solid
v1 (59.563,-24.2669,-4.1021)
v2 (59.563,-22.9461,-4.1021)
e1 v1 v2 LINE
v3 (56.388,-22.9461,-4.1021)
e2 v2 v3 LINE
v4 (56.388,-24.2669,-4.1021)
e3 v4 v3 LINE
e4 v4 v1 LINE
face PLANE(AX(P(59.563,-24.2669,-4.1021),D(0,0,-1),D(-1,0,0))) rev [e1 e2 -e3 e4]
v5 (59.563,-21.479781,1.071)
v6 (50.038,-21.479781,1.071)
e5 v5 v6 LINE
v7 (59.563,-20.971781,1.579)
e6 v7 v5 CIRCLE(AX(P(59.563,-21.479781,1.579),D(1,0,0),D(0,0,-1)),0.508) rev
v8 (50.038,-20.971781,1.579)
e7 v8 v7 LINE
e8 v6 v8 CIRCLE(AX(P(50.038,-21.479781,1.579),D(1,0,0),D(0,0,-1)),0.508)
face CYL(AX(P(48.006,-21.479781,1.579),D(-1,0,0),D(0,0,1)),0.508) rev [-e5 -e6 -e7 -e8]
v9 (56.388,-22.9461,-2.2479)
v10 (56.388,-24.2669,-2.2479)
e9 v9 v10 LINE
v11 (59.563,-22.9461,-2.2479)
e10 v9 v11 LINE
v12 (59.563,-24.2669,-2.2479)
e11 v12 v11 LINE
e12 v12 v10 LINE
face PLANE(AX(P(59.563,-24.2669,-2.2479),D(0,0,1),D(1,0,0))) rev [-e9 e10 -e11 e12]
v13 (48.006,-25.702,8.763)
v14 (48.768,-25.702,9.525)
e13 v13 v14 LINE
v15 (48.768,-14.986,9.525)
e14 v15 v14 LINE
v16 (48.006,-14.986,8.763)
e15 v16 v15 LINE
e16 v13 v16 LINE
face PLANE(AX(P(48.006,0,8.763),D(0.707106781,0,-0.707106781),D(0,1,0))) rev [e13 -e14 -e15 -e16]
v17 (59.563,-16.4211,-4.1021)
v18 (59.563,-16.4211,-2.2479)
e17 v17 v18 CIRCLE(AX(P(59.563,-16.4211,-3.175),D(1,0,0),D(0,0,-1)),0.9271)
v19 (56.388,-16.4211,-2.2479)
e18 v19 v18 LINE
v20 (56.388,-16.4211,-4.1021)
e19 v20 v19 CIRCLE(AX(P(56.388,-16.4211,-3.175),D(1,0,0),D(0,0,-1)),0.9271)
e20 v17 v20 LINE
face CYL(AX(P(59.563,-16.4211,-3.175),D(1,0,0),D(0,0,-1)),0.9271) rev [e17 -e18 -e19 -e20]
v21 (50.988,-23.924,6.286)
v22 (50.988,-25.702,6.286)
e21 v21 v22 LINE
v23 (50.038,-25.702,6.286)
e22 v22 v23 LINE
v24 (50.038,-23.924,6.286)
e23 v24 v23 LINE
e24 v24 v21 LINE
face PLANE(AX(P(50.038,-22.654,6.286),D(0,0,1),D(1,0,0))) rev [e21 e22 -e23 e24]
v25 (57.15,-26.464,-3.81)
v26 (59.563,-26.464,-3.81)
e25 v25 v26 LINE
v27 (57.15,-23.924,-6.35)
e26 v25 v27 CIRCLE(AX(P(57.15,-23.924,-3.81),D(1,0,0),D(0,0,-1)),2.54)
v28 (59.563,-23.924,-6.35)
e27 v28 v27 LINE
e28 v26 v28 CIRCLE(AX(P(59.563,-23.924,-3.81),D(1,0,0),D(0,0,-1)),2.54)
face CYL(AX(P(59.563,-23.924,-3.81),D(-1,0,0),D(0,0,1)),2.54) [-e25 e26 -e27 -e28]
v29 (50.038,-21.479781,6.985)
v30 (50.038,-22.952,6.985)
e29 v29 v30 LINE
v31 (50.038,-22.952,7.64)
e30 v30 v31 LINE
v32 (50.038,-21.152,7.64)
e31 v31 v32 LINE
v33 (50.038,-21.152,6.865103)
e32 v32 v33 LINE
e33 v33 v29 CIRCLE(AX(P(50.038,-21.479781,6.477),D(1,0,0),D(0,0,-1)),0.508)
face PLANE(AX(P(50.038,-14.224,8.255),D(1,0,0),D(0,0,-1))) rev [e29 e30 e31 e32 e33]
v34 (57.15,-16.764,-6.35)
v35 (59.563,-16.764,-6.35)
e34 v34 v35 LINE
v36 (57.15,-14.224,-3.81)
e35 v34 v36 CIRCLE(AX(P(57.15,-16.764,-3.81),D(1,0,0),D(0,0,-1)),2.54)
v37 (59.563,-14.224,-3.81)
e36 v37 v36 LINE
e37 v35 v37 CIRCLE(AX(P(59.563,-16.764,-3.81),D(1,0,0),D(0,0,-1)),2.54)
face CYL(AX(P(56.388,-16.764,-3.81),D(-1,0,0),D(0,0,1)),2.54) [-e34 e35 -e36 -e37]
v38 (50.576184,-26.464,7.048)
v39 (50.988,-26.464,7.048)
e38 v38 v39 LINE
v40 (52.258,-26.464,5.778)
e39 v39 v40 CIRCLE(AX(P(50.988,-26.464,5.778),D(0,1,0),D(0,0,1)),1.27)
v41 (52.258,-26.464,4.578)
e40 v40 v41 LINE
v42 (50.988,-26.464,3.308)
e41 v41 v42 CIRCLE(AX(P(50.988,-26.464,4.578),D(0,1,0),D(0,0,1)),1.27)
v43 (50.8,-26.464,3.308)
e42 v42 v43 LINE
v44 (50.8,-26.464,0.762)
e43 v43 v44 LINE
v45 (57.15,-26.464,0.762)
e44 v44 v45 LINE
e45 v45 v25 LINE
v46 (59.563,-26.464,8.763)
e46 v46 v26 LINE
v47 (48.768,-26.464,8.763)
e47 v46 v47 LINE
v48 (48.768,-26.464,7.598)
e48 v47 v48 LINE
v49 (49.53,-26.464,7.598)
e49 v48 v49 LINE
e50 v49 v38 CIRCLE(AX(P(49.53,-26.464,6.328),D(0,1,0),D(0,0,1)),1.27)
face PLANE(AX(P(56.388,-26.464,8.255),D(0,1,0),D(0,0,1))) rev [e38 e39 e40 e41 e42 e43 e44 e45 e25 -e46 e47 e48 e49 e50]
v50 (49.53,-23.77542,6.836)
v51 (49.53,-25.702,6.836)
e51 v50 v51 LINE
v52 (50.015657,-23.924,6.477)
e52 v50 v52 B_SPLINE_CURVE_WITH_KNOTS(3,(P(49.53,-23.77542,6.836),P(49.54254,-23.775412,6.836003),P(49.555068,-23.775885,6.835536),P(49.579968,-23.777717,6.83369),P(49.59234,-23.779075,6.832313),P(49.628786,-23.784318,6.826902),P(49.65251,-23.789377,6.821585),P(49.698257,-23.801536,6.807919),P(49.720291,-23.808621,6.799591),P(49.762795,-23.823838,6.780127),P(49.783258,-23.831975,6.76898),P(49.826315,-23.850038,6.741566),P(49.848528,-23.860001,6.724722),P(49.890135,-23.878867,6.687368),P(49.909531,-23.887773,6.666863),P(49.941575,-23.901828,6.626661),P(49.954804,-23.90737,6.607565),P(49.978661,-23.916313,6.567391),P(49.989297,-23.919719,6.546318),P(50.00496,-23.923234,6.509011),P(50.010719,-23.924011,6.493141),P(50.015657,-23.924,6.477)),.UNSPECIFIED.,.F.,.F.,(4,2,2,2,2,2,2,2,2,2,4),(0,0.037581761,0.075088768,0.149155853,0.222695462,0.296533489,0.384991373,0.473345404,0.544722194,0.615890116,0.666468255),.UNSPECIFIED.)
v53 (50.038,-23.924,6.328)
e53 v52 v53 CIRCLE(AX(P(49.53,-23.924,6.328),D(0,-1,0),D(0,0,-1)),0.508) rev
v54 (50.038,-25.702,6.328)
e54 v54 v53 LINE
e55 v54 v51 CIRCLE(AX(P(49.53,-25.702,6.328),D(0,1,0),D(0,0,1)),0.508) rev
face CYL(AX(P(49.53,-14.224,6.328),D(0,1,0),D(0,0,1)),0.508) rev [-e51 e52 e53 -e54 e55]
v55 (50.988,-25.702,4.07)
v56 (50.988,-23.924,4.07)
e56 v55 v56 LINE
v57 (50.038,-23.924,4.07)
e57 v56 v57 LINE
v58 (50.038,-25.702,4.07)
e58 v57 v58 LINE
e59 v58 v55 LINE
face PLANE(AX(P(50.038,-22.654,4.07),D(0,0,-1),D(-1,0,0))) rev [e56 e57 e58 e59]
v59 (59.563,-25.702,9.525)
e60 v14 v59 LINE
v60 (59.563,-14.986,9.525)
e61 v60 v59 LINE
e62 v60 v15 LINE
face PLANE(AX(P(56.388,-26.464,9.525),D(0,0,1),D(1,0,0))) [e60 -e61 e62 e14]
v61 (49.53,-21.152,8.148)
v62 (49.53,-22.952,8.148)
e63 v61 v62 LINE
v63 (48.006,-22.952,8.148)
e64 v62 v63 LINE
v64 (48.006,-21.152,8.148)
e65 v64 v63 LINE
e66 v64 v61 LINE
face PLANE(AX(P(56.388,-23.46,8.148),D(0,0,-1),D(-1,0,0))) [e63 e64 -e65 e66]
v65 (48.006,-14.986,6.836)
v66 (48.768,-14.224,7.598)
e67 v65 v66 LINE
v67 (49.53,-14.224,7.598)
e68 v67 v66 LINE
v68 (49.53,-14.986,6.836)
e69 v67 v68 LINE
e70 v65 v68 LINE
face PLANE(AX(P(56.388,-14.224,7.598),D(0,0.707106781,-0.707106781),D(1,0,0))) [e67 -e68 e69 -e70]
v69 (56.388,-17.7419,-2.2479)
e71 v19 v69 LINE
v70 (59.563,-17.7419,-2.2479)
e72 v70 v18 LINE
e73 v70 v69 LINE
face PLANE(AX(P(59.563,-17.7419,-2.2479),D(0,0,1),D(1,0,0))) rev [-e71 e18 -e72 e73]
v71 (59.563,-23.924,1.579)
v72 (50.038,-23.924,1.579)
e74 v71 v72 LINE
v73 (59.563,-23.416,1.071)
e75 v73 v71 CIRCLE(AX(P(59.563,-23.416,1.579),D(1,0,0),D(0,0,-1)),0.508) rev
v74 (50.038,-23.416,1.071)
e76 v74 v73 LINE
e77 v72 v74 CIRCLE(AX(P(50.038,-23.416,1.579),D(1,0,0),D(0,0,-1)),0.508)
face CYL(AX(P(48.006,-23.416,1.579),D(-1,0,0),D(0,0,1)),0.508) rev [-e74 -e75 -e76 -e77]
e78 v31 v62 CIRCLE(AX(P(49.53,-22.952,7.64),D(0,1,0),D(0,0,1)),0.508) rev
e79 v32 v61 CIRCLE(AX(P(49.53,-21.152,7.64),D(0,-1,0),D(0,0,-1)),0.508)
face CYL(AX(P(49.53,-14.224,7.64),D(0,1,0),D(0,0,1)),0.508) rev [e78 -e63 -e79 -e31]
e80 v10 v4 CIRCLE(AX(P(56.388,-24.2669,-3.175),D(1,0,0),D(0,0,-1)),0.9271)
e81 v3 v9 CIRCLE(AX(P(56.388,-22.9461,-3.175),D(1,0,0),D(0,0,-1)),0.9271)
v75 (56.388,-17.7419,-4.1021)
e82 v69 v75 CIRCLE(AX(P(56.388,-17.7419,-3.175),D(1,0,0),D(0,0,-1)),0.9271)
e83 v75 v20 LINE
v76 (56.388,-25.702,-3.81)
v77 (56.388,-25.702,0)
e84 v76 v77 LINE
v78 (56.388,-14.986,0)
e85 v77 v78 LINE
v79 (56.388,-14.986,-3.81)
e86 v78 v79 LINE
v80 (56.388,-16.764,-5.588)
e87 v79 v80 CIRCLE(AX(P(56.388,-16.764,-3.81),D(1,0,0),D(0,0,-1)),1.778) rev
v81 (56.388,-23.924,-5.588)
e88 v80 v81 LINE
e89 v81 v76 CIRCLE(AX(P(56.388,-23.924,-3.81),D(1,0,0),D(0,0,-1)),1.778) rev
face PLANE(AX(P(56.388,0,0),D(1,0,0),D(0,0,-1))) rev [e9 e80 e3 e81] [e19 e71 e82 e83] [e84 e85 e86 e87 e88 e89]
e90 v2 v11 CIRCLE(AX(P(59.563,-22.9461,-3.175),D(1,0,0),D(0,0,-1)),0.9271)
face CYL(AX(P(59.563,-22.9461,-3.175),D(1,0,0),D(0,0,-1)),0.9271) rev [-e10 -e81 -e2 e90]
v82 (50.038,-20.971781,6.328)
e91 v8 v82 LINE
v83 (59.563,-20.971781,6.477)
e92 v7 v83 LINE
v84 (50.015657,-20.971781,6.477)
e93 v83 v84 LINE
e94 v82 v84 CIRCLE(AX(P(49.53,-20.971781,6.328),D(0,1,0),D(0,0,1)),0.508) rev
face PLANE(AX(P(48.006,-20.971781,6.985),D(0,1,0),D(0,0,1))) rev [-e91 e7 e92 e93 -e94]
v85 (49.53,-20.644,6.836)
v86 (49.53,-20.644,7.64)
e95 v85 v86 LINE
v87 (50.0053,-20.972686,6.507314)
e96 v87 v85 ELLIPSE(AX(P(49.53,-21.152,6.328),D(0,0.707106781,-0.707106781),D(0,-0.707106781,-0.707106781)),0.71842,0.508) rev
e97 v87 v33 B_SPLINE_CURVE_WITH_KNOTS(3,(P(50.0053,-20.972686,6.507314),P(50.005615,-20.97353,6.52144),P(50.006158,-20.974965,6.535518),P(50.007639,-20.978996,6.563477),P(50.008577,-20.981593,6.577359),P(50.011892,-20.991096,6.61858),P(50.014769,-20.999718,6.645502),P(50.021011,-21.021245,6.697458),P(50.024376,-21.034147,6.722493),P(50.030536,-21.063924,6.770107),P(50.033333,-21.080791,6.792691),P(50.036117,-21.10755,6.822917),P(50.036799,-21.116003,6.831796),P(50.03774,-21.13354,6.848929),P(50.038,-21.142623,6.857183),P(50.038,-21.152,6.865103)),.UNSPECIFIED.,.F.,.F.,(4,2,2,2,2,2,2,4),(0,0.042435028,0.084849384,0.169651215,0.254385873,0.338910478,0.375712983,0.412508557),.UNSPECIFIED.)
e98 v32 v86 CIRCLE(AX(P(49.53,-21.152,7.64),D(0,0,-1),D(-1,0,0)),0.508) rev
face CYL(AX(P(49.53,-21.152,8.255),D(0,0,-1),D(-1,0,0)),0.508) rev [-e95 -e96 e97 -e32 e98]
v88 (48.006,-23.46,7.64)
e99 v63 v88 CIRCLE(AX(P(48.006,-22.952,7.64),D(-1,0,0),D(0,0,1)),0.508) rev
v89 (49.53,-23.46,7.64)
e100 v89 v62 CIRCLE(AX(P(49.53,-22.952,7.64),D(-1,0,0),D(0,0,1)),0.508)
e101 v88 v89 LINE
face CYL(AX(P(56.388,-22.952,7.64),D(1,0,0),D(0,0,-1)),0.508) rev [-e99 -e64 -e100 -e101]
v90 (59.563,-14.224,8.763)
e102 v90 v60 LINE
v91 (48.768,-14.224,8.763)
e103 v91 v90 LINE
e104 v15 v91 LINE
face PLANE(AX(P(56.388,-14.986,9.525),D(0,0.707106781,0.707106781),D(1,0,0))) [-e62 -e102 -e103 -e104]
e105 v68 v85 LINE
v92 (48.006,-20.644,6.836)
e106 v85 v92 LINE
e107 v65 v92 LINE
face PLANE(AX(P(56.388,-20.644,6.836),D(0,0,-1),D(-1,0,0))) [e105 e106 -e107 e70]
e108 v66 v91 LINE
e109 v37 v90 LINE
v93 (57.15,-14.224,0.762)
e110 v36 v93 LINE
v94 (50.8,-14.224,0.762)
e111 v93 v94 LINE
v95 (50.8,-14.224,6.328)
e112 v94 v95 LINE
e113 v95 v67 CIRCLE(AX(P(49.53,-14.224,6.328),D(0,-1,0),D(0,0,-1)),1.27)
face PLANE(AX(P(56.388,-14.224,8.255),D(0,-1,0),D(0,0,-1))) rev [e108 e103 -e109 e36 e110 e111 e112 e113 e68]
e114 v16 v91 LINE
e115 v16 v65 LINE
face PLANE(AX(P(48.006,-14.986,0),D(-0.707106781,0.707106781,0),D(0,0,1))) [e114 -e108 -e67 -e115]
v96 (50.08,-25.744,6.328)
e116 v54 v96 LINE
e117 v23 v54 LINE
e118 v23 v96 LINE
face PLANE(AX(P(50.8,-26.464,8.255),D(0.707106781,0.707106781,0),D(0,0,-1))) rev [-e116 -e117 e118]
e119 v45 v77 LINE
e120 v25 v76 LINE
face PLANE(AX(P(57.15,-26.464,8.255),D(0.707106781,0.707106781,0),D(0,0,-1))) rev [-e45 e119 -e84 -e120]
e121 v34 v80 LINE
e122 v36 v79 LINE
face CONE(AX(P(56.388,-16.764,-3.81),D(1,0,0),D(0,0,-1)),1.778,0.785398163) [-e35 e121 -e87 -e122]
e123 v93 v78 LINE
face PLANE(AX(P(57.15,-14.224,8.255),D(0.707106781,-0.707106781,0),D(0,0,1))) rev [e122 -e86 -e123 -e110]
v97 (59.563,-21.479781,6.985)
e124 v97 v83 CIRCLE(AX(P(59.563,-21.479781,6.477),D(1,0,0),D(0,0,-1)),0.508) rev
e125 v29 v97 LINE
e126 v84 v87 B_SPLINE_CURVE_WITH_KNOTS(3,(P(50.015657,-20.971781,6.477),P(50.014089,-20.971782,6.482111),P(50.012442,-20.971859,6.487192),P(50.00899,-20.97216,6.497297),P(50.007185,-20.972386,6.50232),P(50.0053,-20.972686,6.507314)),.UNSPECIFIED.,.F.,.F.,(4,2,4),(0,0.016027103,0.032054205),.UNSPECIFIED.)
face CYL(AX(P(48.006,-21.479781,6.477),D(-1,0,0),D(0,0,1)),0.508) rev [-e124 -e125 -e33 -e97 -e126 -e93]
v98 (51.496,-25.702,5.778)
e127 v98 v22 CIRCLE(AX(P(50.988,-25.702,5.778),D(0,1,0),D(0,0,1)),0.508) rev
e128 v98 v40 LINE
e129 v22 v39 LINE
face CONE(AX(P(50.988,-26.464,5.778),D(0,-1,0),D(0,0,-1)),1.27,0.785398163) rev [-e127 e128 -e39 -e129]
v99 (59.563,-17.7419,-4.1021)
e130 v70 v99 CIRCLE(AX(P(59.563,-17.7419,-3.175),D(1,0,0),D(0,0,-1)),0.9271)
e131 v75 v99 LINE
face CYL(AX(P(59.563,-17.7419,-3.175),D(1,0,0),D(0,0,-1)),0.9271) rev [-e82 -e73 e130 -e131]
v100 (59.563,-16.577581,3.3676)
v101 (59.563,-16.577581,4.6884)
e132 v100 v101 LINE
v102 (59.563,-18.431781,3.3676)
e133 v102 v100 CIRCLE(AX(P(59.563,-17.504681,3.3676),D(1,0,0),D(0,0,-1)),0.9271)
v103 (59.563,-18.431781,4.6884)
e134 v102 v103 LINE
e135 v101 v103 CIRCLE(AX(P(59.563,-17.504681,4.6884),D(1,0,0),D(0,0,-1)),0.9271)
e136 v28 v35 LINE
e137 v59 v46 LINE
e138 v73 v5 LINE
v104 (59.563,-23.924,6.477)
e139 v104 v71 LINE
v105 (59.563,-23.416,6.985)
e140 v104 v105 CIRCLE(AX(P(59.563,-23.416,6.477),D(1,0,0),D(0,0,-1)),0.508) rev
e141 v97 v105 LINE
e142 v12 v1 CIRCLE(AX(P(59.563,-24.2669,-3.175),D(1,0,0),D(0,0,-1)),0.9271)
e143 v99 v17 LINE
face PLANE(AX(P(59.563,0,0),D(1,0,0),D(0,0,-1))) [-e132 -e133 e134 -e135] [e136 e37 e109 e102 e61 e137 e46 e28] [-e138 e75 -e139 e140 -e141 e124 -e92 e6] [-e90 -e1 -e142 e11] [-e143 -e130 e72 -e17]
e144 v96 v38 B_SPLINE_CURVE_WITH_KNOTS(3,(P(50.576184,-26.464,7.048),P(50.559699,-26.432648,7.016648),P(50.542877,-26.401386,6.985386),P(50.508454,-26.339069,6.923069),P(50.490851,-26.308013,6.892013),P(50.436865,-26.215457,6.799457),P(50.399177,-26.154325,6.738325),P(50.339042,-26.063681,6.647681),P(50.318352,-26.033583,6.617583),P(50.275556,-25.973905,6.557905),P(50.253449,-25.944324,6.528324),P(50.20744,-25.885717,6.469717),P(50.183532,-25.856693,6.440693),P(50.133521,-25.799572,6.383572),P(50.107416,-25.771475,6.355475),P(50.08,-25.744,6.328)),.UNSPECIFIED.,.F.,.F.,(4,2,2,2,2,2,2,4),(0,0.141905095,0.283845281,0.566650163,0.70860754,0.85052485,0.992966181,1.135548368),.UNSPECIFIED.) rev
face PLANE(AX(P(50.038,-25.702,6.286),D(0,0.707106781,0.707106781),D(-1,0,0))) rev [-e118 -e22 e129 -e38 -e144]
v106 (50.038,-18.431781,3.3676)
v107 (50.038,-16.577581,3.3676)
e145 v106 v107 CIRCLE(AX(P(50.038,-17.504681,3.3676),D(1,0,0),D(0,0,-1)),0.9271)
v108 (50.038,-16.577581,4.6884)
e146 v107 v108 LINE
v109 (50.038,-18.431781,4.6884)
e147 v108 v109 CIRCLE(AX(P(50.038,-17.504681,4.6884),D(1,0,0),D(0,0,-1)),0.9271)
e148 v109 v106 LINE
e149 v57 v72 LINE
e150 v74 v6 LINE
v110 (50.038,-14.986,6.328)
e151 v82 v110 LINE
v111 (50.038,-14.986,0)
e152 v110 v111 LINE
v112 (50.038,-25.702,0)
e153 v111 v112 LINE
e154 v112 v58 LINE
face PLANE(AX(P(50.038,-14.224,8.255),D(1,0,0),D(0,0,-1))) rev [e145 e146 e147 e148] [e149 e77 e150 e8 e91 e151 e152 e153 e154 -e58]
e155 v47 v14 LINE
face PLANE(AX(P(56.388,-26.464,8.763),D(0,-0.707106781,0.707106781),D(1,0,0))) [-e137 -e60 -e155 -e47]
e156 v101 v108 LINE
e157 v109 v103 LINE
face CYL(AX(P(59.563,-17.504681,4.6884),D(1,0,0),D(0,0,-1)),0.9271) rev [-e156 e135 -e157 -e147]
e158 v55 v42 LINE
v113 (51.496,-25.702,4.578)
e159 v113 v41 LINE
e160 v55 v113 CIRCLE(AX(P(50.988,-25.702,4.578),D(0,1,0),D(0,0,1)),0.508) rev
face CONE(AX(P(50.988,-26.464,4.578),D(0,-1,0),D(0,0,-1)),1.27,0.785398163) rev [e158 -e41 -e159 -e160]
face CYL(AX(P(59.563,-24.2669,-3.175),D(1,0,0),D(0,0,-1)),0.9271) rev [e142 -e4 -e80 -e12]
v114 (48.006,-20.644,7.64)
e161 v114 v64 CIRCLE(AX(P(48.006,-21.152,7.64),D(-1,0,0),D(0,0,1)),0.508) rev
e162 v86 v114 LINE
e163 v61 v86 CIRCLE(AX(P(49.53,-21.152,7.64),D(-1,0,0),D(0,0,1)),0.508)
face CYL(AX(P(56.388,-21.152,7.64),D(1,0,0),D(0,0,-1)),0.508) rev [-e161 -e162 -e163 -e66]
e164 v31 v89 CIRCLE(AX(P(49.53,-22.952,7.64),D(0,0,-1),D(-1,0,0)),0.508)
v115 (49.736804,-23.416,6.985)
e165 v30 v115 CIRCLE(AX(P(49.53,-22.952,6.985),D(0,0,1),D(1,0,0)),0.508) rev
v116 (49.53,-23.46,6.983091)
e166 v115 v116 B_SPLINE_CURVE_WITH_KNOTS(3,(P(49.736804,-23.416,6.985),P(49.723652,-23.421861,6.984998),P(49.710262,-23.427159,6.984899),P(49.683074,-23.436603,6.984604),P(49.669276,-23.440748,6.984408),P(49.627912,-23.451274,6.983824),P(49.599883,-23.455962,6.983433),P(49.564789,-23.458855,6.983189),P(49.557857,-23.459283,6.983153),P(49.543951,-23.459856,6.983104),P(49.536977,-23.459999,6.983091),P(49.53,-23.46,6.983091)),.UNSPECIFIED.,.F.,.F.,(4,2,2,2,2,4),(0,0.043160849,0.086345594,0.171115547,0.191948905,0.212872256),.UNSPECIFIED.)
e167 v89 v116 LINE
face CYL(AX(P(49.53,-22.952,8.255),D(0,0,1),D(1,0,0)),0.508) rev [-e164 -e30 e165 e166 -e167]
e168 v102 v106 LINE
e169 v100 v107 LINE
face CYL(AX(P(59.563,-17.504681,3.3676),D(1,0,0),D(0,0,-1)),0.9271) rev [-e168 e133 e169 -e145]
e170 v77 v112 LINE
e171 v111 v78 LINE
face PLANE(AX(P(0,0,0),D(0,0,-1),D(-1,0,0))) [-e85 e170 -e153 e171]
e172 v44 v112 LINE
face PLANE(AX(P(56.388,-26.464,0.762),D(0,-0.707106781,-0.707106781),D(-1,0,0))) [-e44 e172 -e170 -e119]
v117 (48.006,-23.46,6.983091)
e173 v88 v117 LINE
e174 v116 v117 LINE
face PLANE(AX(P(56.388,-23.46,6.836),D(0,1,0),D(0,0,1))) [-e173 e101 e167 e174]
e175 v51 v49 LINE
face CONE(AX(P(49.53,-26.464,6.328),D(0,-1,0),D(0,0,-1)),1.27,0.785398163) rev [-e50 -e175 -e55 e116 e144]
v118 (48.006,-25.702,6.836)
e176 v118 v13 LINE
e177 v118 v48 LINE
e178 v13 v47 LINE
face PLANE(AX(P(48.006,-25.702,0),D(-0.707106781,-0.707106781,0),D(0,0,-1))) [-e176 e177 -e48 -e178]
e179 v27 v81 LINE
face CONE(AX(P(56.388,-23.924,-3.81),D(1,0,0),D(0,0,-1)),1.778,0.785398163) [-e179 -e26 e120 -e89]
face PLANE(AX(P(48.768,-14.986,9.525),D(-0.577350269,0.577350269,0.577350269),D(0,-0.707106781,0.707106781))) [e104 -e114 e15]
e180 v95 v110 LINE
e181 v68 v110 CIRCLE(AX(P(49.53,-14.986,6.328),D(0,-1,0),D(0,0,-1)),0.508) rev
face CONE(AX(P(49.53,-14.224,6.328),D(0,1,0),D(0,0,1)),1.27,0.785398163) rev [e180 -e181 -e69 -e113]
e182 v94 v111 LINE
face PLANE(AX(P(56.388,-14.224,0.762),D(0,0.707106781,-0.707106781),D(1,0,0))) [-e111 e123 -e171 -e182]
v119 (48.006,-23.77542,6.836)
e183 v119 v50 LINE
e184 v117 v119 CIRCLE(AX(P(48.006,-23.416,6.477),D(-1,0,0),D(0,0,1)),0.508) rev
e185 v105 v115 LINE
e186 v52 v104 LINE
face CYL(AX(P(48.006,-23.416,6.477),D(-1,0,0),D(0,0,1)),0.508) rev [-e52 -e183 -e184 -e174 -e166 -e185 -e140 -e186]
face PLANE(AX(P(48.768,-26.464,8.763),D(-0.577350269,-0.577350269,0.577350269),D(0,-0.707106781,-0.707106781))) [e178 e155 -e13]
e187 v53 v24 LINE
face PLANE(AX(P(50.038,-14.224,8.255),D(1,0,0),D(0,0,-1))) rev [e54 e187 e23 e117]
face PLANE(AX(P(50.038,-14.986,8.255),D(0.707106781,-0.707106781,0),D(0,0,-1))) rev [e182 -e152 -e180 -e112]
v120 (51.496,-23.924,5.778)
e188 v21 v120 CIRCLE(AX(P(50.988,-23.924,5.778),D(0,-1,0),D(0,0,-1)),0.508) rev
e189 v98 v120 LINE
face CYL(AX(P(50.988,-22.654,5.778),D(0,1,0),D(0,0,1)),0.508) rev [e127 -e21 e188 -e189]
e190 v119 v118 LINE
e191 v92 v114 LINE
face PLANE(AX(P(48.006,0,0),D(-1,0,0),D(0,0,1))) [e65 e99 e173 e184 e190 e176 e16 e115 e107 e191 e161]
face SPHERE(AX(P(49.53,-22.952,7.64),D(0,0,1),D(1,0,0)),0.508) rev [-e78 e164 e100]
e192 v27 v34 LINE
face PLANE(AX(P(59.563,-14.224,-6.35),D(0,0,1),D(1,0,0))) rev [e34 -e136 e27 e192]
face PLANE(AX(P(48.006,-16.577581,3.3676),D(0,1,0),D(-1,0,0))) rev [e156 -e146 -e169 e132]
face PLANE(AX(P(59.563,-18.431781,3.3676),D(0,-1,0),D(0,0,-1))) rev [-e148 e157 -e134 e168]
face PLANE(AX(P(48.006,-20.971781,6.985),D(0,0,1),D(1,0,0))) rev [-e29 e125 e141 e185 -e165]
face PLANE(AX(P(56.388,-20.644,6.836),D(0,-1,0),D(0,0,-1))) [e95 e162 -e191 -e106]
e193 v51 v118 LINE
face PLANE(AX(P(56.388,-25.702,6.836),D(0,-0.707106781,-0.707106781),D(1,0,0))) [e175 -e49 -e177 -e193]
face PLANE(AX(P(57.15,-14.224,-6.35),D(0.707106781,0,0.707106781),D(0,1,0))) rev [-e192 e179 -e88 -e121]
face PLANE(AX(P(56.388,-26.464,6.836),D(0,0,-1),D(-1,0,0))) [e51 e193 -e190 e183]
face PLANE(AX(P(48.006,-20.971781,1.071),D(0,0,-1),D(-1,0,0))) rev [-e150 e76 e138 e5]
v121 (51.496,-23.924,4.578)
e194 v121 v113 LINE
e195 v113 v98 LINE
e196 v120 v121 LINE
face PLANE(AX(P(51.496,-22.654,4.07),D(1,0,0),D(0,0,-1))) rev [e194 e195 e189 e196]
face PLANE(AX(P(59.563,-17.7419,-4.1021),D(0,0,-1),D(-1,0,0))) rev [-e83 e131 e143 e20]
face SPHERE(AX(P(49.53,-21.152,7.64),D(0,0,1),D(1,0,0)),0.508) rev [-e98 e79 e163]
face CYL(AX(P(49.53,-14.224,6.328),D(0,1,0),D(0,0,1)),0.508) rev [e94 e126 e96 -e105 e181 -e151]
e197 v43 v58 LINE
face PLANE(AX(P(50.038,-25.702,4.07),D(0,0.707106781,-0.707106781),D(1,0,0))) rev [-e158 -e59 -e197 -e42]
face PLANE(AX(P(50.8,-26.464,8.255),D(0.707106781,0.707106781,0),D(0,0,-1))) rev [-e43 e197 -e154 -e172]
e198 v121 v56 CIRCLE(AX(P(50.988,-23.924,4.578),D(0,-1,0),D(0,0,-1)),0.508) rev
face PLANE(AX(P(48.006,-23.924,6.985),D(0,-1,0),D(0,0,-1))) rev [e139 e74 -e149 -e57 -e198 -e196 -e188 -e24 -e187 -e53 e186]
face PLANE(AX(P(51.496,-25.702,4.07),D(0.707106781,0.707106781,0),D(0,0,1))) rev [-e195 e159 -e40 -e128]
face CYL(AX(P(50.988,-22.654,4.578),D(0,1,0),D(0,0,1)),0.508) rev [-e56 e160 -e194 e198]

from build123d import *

# Parameters (mm, degrees)
SKETCH1_W                 = 6.35
SKETCH1_H                 = 12.24
BOSS_EXTRUDE1_DEPTH       = 8.255
BOSS_EXTRUDE2_DEPTH       = 2.032
BOSS_EXTRUDE2_DEPTH_BACK  = 6.35
SKETCH3_W                 = 1.458
SKETCH3_H                 = 2.216
CUT_EXTRUDE1_DEPTH        = 3.81
SKETCH9_W                 = 15.875
SKETCH9_H                 = 12.24
BOSS_EXTRUDE3_DEPTH       = 3.175
FILLET2_R                 = 2.54
F_0_START                 = 50.038
F_0_CLEARANCE_SLOT1_DEPTH = 9.525
F_0_START_2               = 56.388
F_0_CLEARANCE_SLOT2_DEPTH = 3.175
FILLET3_R                 = 0.508
SKETCH12_W                = 5.914
SKETCH12_H                = 2.952219173
CUT_EXTRUDE2_DEPTH        = 31.407781492
FILLET4_R                 = 0.508


# Read off the part's stored shape, not the designer's step: #0 Clearance Slot1, #0 Clearance Slot2
with BuildPart() as part:
    # Sketch1 → Boss-Extrude1 (new body)
    with BuildSketch(Plane.XY):
        with Locations((53.213, -20.344)):
            Rectangle(SKETCH1_W, SKETCH1_H)
    extrude(amount=BOSS_EXTRUDE1_DEPTH)

    # Sketch2 → Boss-Extrude2 (add, two sides: drawn at the far end of the back side and taken through both)
    with BuildSketch(Plane.ZY.offset(-50.038).offset(-BOSS_EXTRUDE2_DEPTH_BACK)):
        Polygon((9.525, -26.464), (6.836, -26.464), (6.836, -23.46), (8.148, -23.46), (8.148, -20.644), (6.836, -20.644), (6.836, -14.224), (9.525, -14.224), align=None)
    extrude(amount=BOSS_EXTRUDE2_DEPTH + BOSS_EXTRUDE2_DEPTH_BACK)

    # Sketch3 → Cut-Extrude1 (cut)
    with BuildSketch(Plane.XZ.offset(26.464)):
        with Locations((50.767, 5.178)):
            Rectangle(SKETCH3_W, SKETCH3_H)
    extrude(amount=-CUT_EXTRUDE1_DEPTH, mode=Mode.SUBTRACT)

    # Sketch9 → Boss-Extrude3 (add)
    with BuildSketch(Plane(origin=(56.388, 0, 0), x_dir=(0, 0, -1), z_dir=(1, 0, 0))):
        with Locations((-1.5875, -20.344)):
            Rectangle(SKETCH9_W, SKETCH9_H)
    extrude(amount=BOSS_EXTRUDE3_DEPTH)

    # Fillet2
    fillet2_edges = [part.edges().sort_by_distance(p)[0] for p in [
        (57.9755, -14.224, -6.35),
        (57.9755, -26.464, -6.35),
    ]]
    fillet(fillet2_edges, radius=FILLET2_R)

    # #0 Clearance Slot1 outline → #0 Clearance Slot1 (cut)
    with BuildSketch(Plane.YZ.offset(F_0_START)):
        with BuildLine():
            Line((-18.431780827, 4.6884), (-18.431780827, 3.3676))
            ThreePointArc((-18.431780827, 3.3676), (-17.504680827, 2.4405), (-16.577580827, 3.3676))
            Line((-16.577580827, 3.3676), (-16.577580827, 4.6884))
            ThreePointArc((-16.577580827, 4.6884), (-17.504680827, 5.6155), (-18.431780827, 4.6884))
        make_face()
    extrude(amount=F_0_CLEARANCE_SLOT1_DEPTH, mode=Mode.SUBTRACT)

    # #0 Clearance Slot2 outline → #0 Clearance Slot2 (cut)
    with BuildSketch(Plane.YZ.offset(F_0_START_2)):
        with BuildLine():
            Line((-22.9461, -2.2479), (-24.2669, -2.2479))
            ThreePointArc((-24.2669, -2.2479), (-25.194, -3.175), (-24.2669, -4.1021))
            Line((-24.2669, -4.1021), (-22.9461, -4.1021))
            ThreePointArc((-22.9461, -4.1021), (-22.019, -3.175), (-22.9461, -2.2479))
        make_face()
        with BuildLine():
            ThreePointArc((-16.4211, -4.1021), (-15.494, -3.175), (-16.4211, -2.2479))
            Line((-16.4211, -2.2479), (-17.7419, -2.2479))
            ThreePointArc((-17.7419, -2.2479), (-18.669, -3.175), (-17.7419, -4.1021))
            Line((-17.7419, -4.1021), (-16.4211, -4.1021))
        make_face()
    extrude(amount=F_0_CLEARANCE_SLOT2_DEPTH, mode=Mode.SUBTRACT)

    # Fillet3
    fillet3_edges = [part.edges().sort_by_distance(p)[0] for p in [
        (50.038, -17.434, 6.836),
        (50.038, -20.644, 7.492),
        (50.038, -22.052, 8.148),
        (50.038, -23.46, 7.492),
        (49.022, -23.46, 8.148),
        (49.022, -20.644, 8.148),
        (50.038, -24.962, 6.836),
        (50.767, -22.654, 6.286),
        (51.496, -22.654, 5.178),
        (51.496, -24.559, 6.286),
        (50.767, -22.654, 4.07),
        (51.496, -24.559, 4.07),
    ]]
    fillet(fillet3_edges, radius=FILLET3_R)

    # Chamfer3
    # the kernel refuses this chamfer: 0.762 mm, written as the material it takes off along each edge
    with BuildSketch(Plane(origin=(48.514, -25.956, 9.017), x_dir=(0, -0.7071067811865475, -0.7071067811865475), z_dir=(-0.5773502691896257, -0.5773502691896257, 0.5773502691896257)), Plane(origin=(48.514, -14.732, 9.017), x_dir=(0, -0.7071067811865475, 0.7071067811865475), z_dir=(-0.5773502691896257, 0.5773502691896257, 0.5773502691896257))) as chamfer3_piece_1:
        Polygon((-0.538815367, 0.311085197), (0.538815367, 0.311085197), (0, -0.622170395), align=None)
    extrude(amount=0.967869991, mode=Mode.SUBTRACT)
    with BuildSketch(Plane(origin=(49.53, -14.224, 6.836), x_dir=(0, 0.027495876610587274, 0.9996219169112966), z_dir=(-1, 0, 0)), Plane(origin=(46.046377563, -26.464, 6.836), x_dir=(0, -0.027495876610587274, 0.9996219169112966), z_dir=(1, 0, 0))) as chamfer3_piece_2:
        with BuildLine():
            Line((0.783848975, 0), (-0.043088932, -0.782663759))
            Line((-0.043088932, -0.782663759), (-0.05832317, -0.782244722))
            ThreePointArc((-0.05832317, -0.782244722), (-0.026006471, -0.391209146), (-0.015234238, 0.000419037))
            Line((-0.015234238, 0.000419037), (0.000419037, 0.015234238))
            ThreePointArc((0.000419037, 0.015234238), (0.392047221, 0.004462005), (0.784268012, 0.015234238))
            Line((0.784268012, 0.015234238), (0.783848975, 0))
        make_face()
    extrude(amount=3.483622437, mode=Mode.SUBTRACT)
    with BuildSketch(Plane(origin=(49.53, -14.224, 6.328), x_dir=(1, 0, 0), z_dir=(0, 0, -1))) as chamfer3_piece_3:
        with BuildLine():
            Line((1.291552615, -0.021552615), (0.486447385, 0.783552615))
            Line((0.486447385, 0.783552615), (0.471207385, 0.783552615))
            ThreePointArc((0.471207385, 0.783552615), (0.49276, 0.391776307), (0.49276, 0))
            Line((0.49276, 0), (0.508, -0.01524))
            ThreePointArc((0.508, -0.01524), (0.899776307, -0.01524), (1.291552615, -0.036792615))
            Line((1.291552615, -0.036792615), (1.291552615, -0.021552615))
        make_face()
    revolve(axis=Axis((49.53, -14.224, 6.328), (0, -1, 0)), revolution_arc=90, mode=Mode.SUBTRACT)
    with BuildSketch(Plane(origin=(50.038, -14.224, -1.959622437), x_dir=(0.9996219169112966, 0.027495876610587368, 0), z_dir=(0, 0, 1))) as chamfer3_piece_4:
        with BuildLine():
            Line((0.783848975, 0), (-0.043088932, -0.782663759))
            Line((-0.043088932, -0.782663759), (-0.05832317, -0.782244722))
            ThreePointArc((-0.05832317, -0.782244722), (-0.026006471, -0.391209146), (-0.015234238, 0.000419037))
            Line((-0.015234238, 0.000419037), (0.000419037, 0.015234238))
            ThreePointArc((0.000419037, 0.015234238), (0.392047221, 0.004462005), (0.784268012, 0.015234238))
            Line((0.784268012, 0.015234238), (0.783848975, 0))
        make_face()
    extrude(amount=8.287622437, mode=Mode.SUBTRACT)
    with BuildSketch(Plane(origin=(56.388, -14.224, 0), x_dir=(0, 0.02749587661058728, 0.9996219169112966), z_dir=(-1, 0, 0))) as chamfer3_piece_5:
        with BuildLine():
            Line((0.783848975, 0), (-0.043088932, -0.782663759))
            Line((-0.043088932, -0.782663759), (-0.05832317, -0.782244722))
            ThreePointArc((-0.05832317, -0.782244722), (-0.026006471, -0.391209146), (-0.015234238, 0.000419037))
            Line((-0.015234238, 0.000419037), (0.000419037, 0.015234238))
            ThreePointArc((0.000419037, 0.015234238), (0.392047221, 0.004462005), (0.784268012, 0.015234238))
            Line((0.784268012, 0.015234238), (0.783848975, 0))
        make_face()
    extrude(amount=8.309622437, mode=Mode.SUBTRACT)
    with BuildSketch(Plane(origin=(49.53, -26.464, 6.328), x_dir=(1, 0, 0), z_dir=(0, 0, -1))) as chamfer3_piece_6:
        with BuildLine():
            Line((1.291552615, 0.021552615), (0.486447385, -0.783552615))
            Line((0.486447385, -0.783552615), (0.471207385, -0.783552615))
            ThreePointArc((0.471207385, -0.783552615), (0.49276, -0.391776307), (0.49276, 0))
            Line((0.49276, 0), (0.508, 0.01524))
            ThreePointArc((0.508, 0.01524), (0.899776307, 0.01524), (1.291552615, 0.036792615))
            Line((1.291552615, 0.036792615), (1.291552615, 0.021552615))
        make_face()
    revolve(axis=Axis((49.53, -26.464, 6.328), (0, -1, 0)), revolution_arc=90, mode=Mode.SUBTRACT)
    with BuildSketch(Plane(origin=(46.046377563, -26.464, 9.525), x_dir=(0, 0.9996219169112968, 0.027495876610587246), z_dir=(1, 0, 0)), Plane(origin=(46.046377563, -14.224, 9.525), x_dir=(0, 0.027495876610587246, -0.9996219169112968), z_dir=(1, 0, 0))) as chamfer3_piece_7:
        with BuildLine():
            Line((0.783848975, 0), (-0.043088932, -0.782663759))
            Line((-0.043088932, -0.782663759), (-0.05832317, -0.782244722))
            ThreePointArc((-0.05832317, -0.782244722), (-0.026006471, -0.391209146), (-0.015234238, 0.000419037))
            Line((-0.015234238, 0.000419037), (0.000419037, 0.015234238))
            ThreePointArc((0.000419037, 0.015234238), (0.392047221, 0.004462005), (0.784268012, 0.015234238))
            Line((0.784268012, 0.015234238), (0.783848975, 0))
        make_face()
    extrude(amount=15.476244874, mode=Mode.SUBTRACT)
    with BuildSketch(Plane(origin=(48.006, -14.224, 4.876377563), x_dir=(0.9996219169112966, 0.027495876610587368, 0), z_dir=(0, 0, 1))) as chamfer3_piece_8:
        with BuildLine():
            Line((0.783848975, 0), (-0.043088932, -0.782663759))
            Line((-0.043088932, -0.782663759), (-0.05832317, -0.782244722))
            ThreePointArc((-0.05832317, -0.782244722), (-0.026006471, -0.391209146), (-0.015234238, 0.000419037))
            Line((-0.015234238, 0.000419037), (0.000419037, 0.015234238))
            ThreePointArc((0.000419037, 0.015234238), (0.392047221, 0.004462005), (0.784268012, 0.015234238))
            Line((0.784268012, 0.015234238), (0.783848975, 0))
        make_face()
    extrude(amount=6.608244874, mode=Mode.SUBTRACT)
    with BuildSketch(Plane(origin=(48.006, -12.264377563, 9.525), x_dir=(-0.027495876610582715, 0, -0.9996219169112968), z_dir=(0, -1, 0))) as chamfer3_piece_9:
        with BuildLine():
            Line((0.783848975, 0), (-0.043088932, 0.782663759))
            Line((-0.043088932, 0.782663759), (-0.05832317, 0.782244722))
            ThreePointArc((-0.05832317, 0.782244722), (-0.026006471, 0.391209146), (-0.015234238, -0.000419037))
            Line((-0.015234238, -0.000419037), (0.000419037, -0.015234238))
            ThreePointArc((0.000419037, -0.015234238), (0.392047221, -0.004462005), (0.784268012, -0.015234238))
            Line((0.784268012, -0.015234238), (0.783848975, 0))
        make_face()
    extrude(amount=16.159244874, mode=Mode.SUBTRACT)
    with BuildSketch(Plane(origin=(48.006, -26.464, 11.484622437), x_dir=(-0.027495876610582715, 0.9996219169112968, 0), z_dir=(0, 0, -1))) as chamfer3_piece_10:
        with BuildLine():
            Line((0.783848975, 0), (-0.043088932, 0.782663759))
            Line((-0.043088932, 0.782663759), (-0.05832317, 0.782244722))
            ThreePointArc((-0.05832317, 0.782244722), (-0.026006471, 0.391209146), (-0.015234238, -0.000419037))
            Line((-0.015234238, -0.000419037), (0.000419037, -0.015234238))
            ThreePointArc((0.000419037, -0.015234238), (0.392047221, -0.004462005), (0.784268012, -0.015234238))
            Line((0.784268012, -0.015234238), (0.783848975, 0))
        make_face()
    extrude(amount=6.608244874, mode=Mode.SUBTRACT)
    with BuildSketch(Plane(origin=(56.388, -14.224, 0), x_dir=(0.9996219169112966, 0.027495876610587368, 0), z_dir=(0, 0, -1))) as chamfer3_piece_11:
        with BuildLine():
            Line((0.783848975, 0), (-0.043088932, 0.782663759))
            Line((-0.043088932, 0.782663759), (-0.05832317, 0.782244722))
            ThreePointArc((-0.05832317, 0.782244722), (-0.026006471, 0.391209146), (-0.015234238, -0.000419037))
            Line((-0.015234238, -0.000419037), (0.000419037, -0.015234238))
            ThreePointArc((0.000419037, -0.015234238), (0.392047221, -0.004462005), (0.784268012, -0.015234238))
            Line((0.784268012, -0.015234238), (0.783848975, 0))
        make_face()
    extrude(amount=3.81, mode=Mode.SUBTRACT)
    with BuildSketch(Plane(origin=(50.988, -26.464, 6.286), x_dir=(0, -0.027495876610587305, 0.9996219169112966), z_dir=(-1, 0, 0)), Plane(origin=(48.078377563, -26.464, 4.07), x_dir=(0, -0.027495876610587288, -0.9996219169112966), z_dir=(1, 0, 0))) as chamfer3_piece_12:
        with BuildLine():
            Line((0.783848975, 0), (-0.043088932, 0.782663759))
            Line((-0.043088932, 0.782663759), (-0.05832317, 0.782244722))
            ThreePointArc((-0.05832317, 0.782244722), (-0.026006471, 0.391209146), (-0.015234238, -0.000419037))
            Line((-0.015234238, -0.000419037), (0.000419037, -0.015234238))
            ThreePointArc((0.000419037, -0.015234238), (0.392047221, -0.004462005), (0.784268012, -0.015234238))
            Line((0.784268012, -0.015234238), (0.783848975, 0))
        make_face()
    extrude(amount=2.909622437, mode=Mode.SUBTRACT)
    with BuildSketch(Plane(origin=(56.388, -16.764, -3.81), x_dir=(0, 1, 0), z_dir=(0, 0, 1))) as chamfer3_piece_13:
        with BuildLine():
            Line((1.756447385, 0.021552615), (2.561552615, -0.783552615))
            Line((2.561552615, -0.783552615), (2.576792615, -0.783552615))
            ThreePointArc((2.576792615, -0.783552615), (2.55524, -0.391776307), (2.55524, 0))
            Line((2.55524, 0), (2.54, 0.01524))
            ThreePointArc((2.54, 0.01524), (2.148223693, 0.01524), (1.756447385, 0.036792615))
            Line((1.756447385, 0.036792615), (1.756447385, 0.021552615))
        make_face()
    revolve(axis=Axis((56.388, -16.764, -3.81), (-1, 0, 0)), revolution_arc=90, mode=Mode.SUBTRACT)
    with BuildSketch(Plane(origin=(50.988, -26.464, 5.778), x_dir=(0, 0, 1), z_dir=(-1, 0, 0))) as chamfer3_piece_14:
        with BuildLine():
            Line((1.291552615, -0.021552615), (0.486447385, 0.783552615))
            Line((0.486447385, 0.783552615), (0.471207385, 0.783552615))
            ThreePointArc((0.471207385, 0.783552615), (0.49276, 0.391776307), (0.49276, 0))
            Line((0.49276, 0), (0.508, -0.01524))
            ThreePointArc((0.508, -0.01524), (0.899776307, -0.01524), (1.291552615, -0.036792615))
            Line((1.291552615, -0.036792615), (1.291552615, -0.021552615))
        make_face()
    revolve(axis=Axis((50.988, -26.464, 5.778), (0, 1, 0)), revolution_arc=90, mode=Mode.SUBTRACT)
    with BuildSketch(Plane(origin=(56.388, -16.764, -6.35), x_dir=(-0.027495876610582747, 0, 0.9996219169112968), z_dir=(0, -1, 0))) as chamfer3_piece_15:
        with BuildLine():
            Line((0.783848975, 0), (-0.043088932, -0.782663759))
            Line((-0.043088932, -0.782663759), (-0.05832317, -0.782244722))
            ThreePointArc((-0.05832317, -0.782244722), (-0.026006471, -0.391209146), (-0.015234238, 0.000419037))
            Line((-0.015234238, 0.000419037), (0.000419037, 0.015234238))
            ThreePointArc((0.000419037, 0.015234238), (0.392047221, 0.004462005), (0.784268012, 0.015234238))
            Line((0.784268012, 0.015234238), (0.783848975, 0))
        make_face()
    extrude(amount=7.16, mode=Mode.SUBTRACT)
    with BuildSketch(Plane(origin=(51.496, -26.464, 4.578), x_dir=(0.9996219169112966, -0.027495876610587368, 0), z_dir=(0, 0, 1))) as chamfer3_piece_16:
        with BuildLine():
            Line((0.783848975, 0), (-0.043088932, 0.782663759))
            Line((-0.043088932, 0.782663759), (-0.05832317, 0.782244722))
            ThreePointArc((-0.05832317, 0.782244722), (-0.026006471, 0.391209146), (-0.015234238, -0.000419037))
            Line((-0.015234238, -0.000419037), (0.000419037, -0.015234238))
            ThreePointArc((0.000419037, -0.015234238), (0.392047221, -0.004462005), (0.784268012, -0.015234238))
            Line((0.784268012, -0.015234238), (0.783848975, 0))
        make_face()
    extrude(amount=1.2, mode=Mode.SUBTRACT)
    with BuildSketch(Plane(origin=(56.388, -23.924, -3.81), x_dir=(0, -1, 0), z_dir=(0, 0, 1))) as chamfer3_piece_17:
        with BuildLine():
            Line((1.756447385, -0.021552615), (2.561552615, 0.783552615))
            Line((2.561552615, 0.783552615), (2.576792615, 0.783552615))
            ThreePointArc((2.576792615, 0.783552615), (2.55524, 0.391776307), (2.55524, 0))
            Line((2.55524, 0), (2.54, -0.01524))
            ThreePointArc((2.54, -0.01524), (2.148223693, -0.01524), (1.756447385, -0.036792615))
            Line((1.756447385, -0.036792615), (1.756447385, -0.021552615))
        make_face()
    revolve(axis=Axis((56.388, -23.924, -3.81), (1, 0, 0)), revolution_arc=90, mode=Mode.SUBTRACT)
    with BuildSketch(Plane(origin=(50.988, -26.464, 4.578), x_dir=(0, 0, -1), z_dir=(-1, 0, 0))) as chamfer3_piece_18:
        with BuildLine():
            Line((1.291552615, 0.021552615), (0.486447385, -0.783552615))
            Line((0.486447385, -0.783552615), (0.471207385, -0.783552615))
            ThreePointArc((0.471207385, -0.783552615), (0.49276, -0.391776307), (0.49276, 0))
            Line((0.49276, 0), (0.508, 0.01524))
            ThreePointArc((0.508, 0.01524), (0.899776307, 0.01524), (1.291552615, 0.036792615))
            Line((1.291552615, 0.036792615), (1.291552615, 0.021552615))
        make_face()
    revolve(axis=Axis((50.988, -26.464, 4.578), (0, -1, 0)), revolution_arc=90, mode=Mode.SUBTRACT)
    with BuildSketch(Plane(origin=(56.388, -26.464, -3.81), x_dir=(-0.027495876610582715, 0.9996219169112968, 0), z_dir=(0, 0, 1))) as chamfer3_piece_19:
        with BuildLine():
            Line((0.783848975, 0), (-0.043088932, -0.782663759))
            Line((-0.043088932, -0.782663759), (-0.05832317, -0.782244722))
            ThreePointArc((-0.05832317, -0.782244722), (-0.026006471, -0.391209146), (-0.015234238, 0.000419037))
            Line((-0.015234238, 0.000419037), (0.000419037, 0.015234238))
            ThreePointArc((0.000419037, 0.015234238), (0.392047221, 0.004462005), (0.784268012, 0.015234238))
            Line((0.784268012, 0.015234238), (0.783848975, 0))
        make_face()
    extrude(amount=3.81, mode=Mode.SUBTRACT)
    with BuildSketch(Plane(origin=(50.038, -26.464, -1.959622437), x_dir=(-0.027495876610582715, 0.9996219169112968, 0), z_dir=(0, 0, 1))) as chamfer3_piece_20:
        with BuildLine():
            Line((0.783848975, 0), (-0.043088932, -0.782663759))
            Line((-0.043088932, -0.782663759), (-0.05832317, -0.782244722))
            ThreePointArc((-0.05832317, -0.782244722), (-0.026006471, -0.391209146), (-0.015234238, 0.000419037))
            Line((-0.015234238, 0.000419037), (0.000419037, 0.015234238))
            ThreePointArc((0.000419037, 0.015234238), (0.392047221, 0.004462005), (0.784268012, 0.015234238))
            Line((0.784268012, 0.015234238), (0.783848975, 0))
        make_face()
    extrude(amount=7.989244874, mode=Mode.SUBTRACT)
    with BuildSketch(Plane(origin=(48.078377563, -26.464, 0), x_dir=(0, 0.9996219169112968, -0.027495876610586327), z_dir=(1, 0, 0))) as chamfer3_piece_21:
        with BuildLine():
            Line((0.783848975, 0), (-0.043088932, 0.782663759))
            Line((-0.043088932, 0.782663759), (-0.05832317, 0.782244722))
            ThreePointArc((-0.05832317, 0.782244722), (-0.026006471, 0.391209146), (-0.015234238, -0.000419037))
            Line((-0.015234238, -0.000419037), (0.000419037, -0.015234238))
            ThreePointArc((0.000419037, -0.015234238), (0.392047221, -0.004462005), (0.784268012, -0.015234238))
            Line((0.784268012, -0.015234238), (0.783848975, 0))
        make_face()
    extrude(amount=8.309622437, mode=Mode.SUBTRACT)
    with BuildSketch(Plane(origin=(50.038, -26.464, 4.326377563), x_dir=(-0.027495876610582715, 0.9996219169112968, 0), z_dir=(0, 0, 1))) as chamfer3_piece_22:
        with BuildLine():
            Line((0.783848975, 0), (-0.043088932, -0.782663759))
            Line((-0.043088932, -0.782663759), (-0.05832317, -0.782244722))
            ThreePointArc((-0.05832317, -0.782244722), (-0.026006471, -0.391209146), (-0.015234238, 0.000419037))
            Line((-0.015234238, 0.000419037), (0.000419037, 0.015234238))
            ThreePointArc((0.000419037, 0.015234238), (0.392047221, 0.004462005), (0.784268012, 0.015234238))
            Line((0.784268012, 0.015234238), (0.783848975, 0))
        make_face()
    extrude(amount=2.001622437, mode=Mode.SUBTRACT)
    with BuildSketch(Plane(origin=(58.347622437, -14.224, 0), x_dir=(0, 0.02749587661058728, 0.9996219169112966), z_dir=(-1, 0, 0))) as chamfer3_piece_23a_section:
        with BuildLine():
            Line((0.783848975, 0), (-0.043088932, -0.782663759))
            Line((-0.043088932, -0.782663759), (-0.05832317, -0.782244722))
            ThreePointArc((-0.05832317, -0.782244722), (-0.026006471, -0.391209146), (-0.015234238, 0.000419037))
            Line((-0.015234238, 0.000419037), (0.000419037, 0.015234238))
            ThreePointArc((0.000419037, 0.015234238), (0.392047221, 0.004462005), (0.784268012, 0.015234238))
            Line((0.784268012, 0.015234238), (0.783848975, 0))
        make_face()
    chamfer3_piece_23a = extrude(amount=10.269244874, mode=Mode.PRIVATE)
    chamfer3_piece_23a = split(chamfer3_piece_23a, bisect_by=Plane(origin=(56.388, -14.475302744, 0.251302744), z_dir=(1, 0, 0)), keep=Keep.TOP, mode=Mode.PRIVATE)
    with BuildSketch(Plane(origin=(56.388, -14.224, 1.959622437), x_dir=(0.9996219169112966, 0.027495876610587368, 0), z_dir=(0, 0, -1))) as chamfer3_piece_23b_section:
        with BuildLine():
            Line((0.783848975, 0), (-0.043088932, 0.782663759))
            Line((-0.043088932, 0.782663759), (-0.05832317, 0.782244722))
            ThreePointArc((-0.05832317, 0.782244722), (-0.026006471, 0.391209146), (-0.015234238, -0.000419037))
            Line((-0.015234238, -0.000419037), (0.000419037, -0.015234238))
            ThreePointArc((0.000419037, -0.015234238), (0.392047221, -0.004462005), (0.784268012, -0.015234238))
            Line((0.784268012, -0.015234238), (0.783848975, 0))
        make_face()
    chamfer3_piece_23b = extrude(amount=5.769622437, mode=Mode.PRIVATE)
    chamfer3_piece_23b = split(chamfer3_piece_23b, bisect_by=Plane(origin=(56.639302744, -14.475302744, 0), z_dir=(0, 0, 1)), keep=Keep.TOP, mode=Mode.PRIVATE)
    chamfer3_piece_23 = chamfer3_piece_23a & chamfer3_piece_23b
    add(chamfer3_piece_23, mode=Mode.SUBTRACT)
    with BuildSketch(Plane(origin=(48.078377563, -26.464, 0), x_dir=(0, 0.9996219169112968, -0.027495876610586327), z_dir=(1, 0, 0))) as chamfer3_piece_24a_section:
        with BuildLine():
            Line((0.783848975, 0), (-0.043088932, 0.782663759))
            Line((-0.043088932, 0.782663759), (-0.05832317, 0.782244722))
            ThreePointArc((-0.05832317, 0.782244722), (-0.026006471, 0.391209146), (-0.015234238, -0.000419037))
            Line((-0.015234238, -0.000419037), (0.000419037, -0.015234238))
            ThreePointArc((0.000419037, -0.015234238), (0.392047221, -0.004462005), (0.784268012, -0.015234238))
            Line((0.784268012, -0.015234238), (0.783848975, 0))
        make_face()
    chamfer3_piece_24a = extrude(amount=10.269244874, mode=Mode.PRIVATE)
    chamfer3_piece_24a = split(chamfer3_piece_24a, bisect_by=Plane(origin=(56.388, -26.212697256, 0.251302744), z_dir=(1, 0, 0)), keep=Keep.TOP, mode=Mode.PRIVATE)
    with BuildSketch(Plane(origin=(56.388, -26.464, -3.81), x_dir=(-0.027495876610582715, 0.9996219169112968, 0), z_dir=(0, 0, 1))) as chamfer3_piece_24b_section:
        with BuildLine():
            Line((0.783848975, 0), (-0.043088932, -0.782663759))
            Line((-0.043088932, -0.782663759), (-0.05832317, -0.782244722))
            ThreePointArc((-0.05832317, -0.782244722), (-0.026006471, -0.391209146), (-0.015234238, 0.000419037))
            Line((-0.015234238, 0.000419037), (0.000419037, 0.015234238))
            ThreePointArc((0.000419037, 0.015234238), (0.392047221, 0.004462005), (0.784268012, 0.015234238))
            Line((0.784268012, 0.015234238), (0.783848975, 0))
        make_face()
    chamfer3_piece_24b = extrude(amount=5.769622437, mode=Mode.PRIVATE)
    chamfer3_piece_24b = split(chamfer3_piece_24b, bisect_by=Plane(origin=(56.639302744, -26.212697256, 0), z_dir=(0, 0, 1)), keep=Keep.TOP, mode=Mode.PRIVATE)
    chamfer3_piece_24 = chamfer3_piece_24a & chamfer3_piece_24b
    add(chamfer3_piece_24, mode=Mode.SUBTRACT)

    # Sketch12 → Cut-Extrude2 (cut, through all)
    with BuildSketch(Plane(origin=(59.563, 0, 0), x_dir=(0, 0, -1), z_dir=(1, 0, 0))):
        with Locations((-4.028, -22.447890414)):
            Rectangle(SKETCH12_W, SKETCH12_H)
    extrude(amount=-CUT_EXTRUDE2_DEPTH, mode=Mode.SUBTRACT)

    # Fillet4
    fillet4_edges = [part.edges().sort_by_distance(p)[0] for p in [
        (53.7845, -23.924, 6.985),
        (54.8005, -23.924, 1.071),
        (54.8005, -20.971780827, 1.071),
        (54.783978972, -20.971780827, 6.985),
    ]]
    fillet(fillet4_edges, radius=FILLET4_R)


solid = part.part
